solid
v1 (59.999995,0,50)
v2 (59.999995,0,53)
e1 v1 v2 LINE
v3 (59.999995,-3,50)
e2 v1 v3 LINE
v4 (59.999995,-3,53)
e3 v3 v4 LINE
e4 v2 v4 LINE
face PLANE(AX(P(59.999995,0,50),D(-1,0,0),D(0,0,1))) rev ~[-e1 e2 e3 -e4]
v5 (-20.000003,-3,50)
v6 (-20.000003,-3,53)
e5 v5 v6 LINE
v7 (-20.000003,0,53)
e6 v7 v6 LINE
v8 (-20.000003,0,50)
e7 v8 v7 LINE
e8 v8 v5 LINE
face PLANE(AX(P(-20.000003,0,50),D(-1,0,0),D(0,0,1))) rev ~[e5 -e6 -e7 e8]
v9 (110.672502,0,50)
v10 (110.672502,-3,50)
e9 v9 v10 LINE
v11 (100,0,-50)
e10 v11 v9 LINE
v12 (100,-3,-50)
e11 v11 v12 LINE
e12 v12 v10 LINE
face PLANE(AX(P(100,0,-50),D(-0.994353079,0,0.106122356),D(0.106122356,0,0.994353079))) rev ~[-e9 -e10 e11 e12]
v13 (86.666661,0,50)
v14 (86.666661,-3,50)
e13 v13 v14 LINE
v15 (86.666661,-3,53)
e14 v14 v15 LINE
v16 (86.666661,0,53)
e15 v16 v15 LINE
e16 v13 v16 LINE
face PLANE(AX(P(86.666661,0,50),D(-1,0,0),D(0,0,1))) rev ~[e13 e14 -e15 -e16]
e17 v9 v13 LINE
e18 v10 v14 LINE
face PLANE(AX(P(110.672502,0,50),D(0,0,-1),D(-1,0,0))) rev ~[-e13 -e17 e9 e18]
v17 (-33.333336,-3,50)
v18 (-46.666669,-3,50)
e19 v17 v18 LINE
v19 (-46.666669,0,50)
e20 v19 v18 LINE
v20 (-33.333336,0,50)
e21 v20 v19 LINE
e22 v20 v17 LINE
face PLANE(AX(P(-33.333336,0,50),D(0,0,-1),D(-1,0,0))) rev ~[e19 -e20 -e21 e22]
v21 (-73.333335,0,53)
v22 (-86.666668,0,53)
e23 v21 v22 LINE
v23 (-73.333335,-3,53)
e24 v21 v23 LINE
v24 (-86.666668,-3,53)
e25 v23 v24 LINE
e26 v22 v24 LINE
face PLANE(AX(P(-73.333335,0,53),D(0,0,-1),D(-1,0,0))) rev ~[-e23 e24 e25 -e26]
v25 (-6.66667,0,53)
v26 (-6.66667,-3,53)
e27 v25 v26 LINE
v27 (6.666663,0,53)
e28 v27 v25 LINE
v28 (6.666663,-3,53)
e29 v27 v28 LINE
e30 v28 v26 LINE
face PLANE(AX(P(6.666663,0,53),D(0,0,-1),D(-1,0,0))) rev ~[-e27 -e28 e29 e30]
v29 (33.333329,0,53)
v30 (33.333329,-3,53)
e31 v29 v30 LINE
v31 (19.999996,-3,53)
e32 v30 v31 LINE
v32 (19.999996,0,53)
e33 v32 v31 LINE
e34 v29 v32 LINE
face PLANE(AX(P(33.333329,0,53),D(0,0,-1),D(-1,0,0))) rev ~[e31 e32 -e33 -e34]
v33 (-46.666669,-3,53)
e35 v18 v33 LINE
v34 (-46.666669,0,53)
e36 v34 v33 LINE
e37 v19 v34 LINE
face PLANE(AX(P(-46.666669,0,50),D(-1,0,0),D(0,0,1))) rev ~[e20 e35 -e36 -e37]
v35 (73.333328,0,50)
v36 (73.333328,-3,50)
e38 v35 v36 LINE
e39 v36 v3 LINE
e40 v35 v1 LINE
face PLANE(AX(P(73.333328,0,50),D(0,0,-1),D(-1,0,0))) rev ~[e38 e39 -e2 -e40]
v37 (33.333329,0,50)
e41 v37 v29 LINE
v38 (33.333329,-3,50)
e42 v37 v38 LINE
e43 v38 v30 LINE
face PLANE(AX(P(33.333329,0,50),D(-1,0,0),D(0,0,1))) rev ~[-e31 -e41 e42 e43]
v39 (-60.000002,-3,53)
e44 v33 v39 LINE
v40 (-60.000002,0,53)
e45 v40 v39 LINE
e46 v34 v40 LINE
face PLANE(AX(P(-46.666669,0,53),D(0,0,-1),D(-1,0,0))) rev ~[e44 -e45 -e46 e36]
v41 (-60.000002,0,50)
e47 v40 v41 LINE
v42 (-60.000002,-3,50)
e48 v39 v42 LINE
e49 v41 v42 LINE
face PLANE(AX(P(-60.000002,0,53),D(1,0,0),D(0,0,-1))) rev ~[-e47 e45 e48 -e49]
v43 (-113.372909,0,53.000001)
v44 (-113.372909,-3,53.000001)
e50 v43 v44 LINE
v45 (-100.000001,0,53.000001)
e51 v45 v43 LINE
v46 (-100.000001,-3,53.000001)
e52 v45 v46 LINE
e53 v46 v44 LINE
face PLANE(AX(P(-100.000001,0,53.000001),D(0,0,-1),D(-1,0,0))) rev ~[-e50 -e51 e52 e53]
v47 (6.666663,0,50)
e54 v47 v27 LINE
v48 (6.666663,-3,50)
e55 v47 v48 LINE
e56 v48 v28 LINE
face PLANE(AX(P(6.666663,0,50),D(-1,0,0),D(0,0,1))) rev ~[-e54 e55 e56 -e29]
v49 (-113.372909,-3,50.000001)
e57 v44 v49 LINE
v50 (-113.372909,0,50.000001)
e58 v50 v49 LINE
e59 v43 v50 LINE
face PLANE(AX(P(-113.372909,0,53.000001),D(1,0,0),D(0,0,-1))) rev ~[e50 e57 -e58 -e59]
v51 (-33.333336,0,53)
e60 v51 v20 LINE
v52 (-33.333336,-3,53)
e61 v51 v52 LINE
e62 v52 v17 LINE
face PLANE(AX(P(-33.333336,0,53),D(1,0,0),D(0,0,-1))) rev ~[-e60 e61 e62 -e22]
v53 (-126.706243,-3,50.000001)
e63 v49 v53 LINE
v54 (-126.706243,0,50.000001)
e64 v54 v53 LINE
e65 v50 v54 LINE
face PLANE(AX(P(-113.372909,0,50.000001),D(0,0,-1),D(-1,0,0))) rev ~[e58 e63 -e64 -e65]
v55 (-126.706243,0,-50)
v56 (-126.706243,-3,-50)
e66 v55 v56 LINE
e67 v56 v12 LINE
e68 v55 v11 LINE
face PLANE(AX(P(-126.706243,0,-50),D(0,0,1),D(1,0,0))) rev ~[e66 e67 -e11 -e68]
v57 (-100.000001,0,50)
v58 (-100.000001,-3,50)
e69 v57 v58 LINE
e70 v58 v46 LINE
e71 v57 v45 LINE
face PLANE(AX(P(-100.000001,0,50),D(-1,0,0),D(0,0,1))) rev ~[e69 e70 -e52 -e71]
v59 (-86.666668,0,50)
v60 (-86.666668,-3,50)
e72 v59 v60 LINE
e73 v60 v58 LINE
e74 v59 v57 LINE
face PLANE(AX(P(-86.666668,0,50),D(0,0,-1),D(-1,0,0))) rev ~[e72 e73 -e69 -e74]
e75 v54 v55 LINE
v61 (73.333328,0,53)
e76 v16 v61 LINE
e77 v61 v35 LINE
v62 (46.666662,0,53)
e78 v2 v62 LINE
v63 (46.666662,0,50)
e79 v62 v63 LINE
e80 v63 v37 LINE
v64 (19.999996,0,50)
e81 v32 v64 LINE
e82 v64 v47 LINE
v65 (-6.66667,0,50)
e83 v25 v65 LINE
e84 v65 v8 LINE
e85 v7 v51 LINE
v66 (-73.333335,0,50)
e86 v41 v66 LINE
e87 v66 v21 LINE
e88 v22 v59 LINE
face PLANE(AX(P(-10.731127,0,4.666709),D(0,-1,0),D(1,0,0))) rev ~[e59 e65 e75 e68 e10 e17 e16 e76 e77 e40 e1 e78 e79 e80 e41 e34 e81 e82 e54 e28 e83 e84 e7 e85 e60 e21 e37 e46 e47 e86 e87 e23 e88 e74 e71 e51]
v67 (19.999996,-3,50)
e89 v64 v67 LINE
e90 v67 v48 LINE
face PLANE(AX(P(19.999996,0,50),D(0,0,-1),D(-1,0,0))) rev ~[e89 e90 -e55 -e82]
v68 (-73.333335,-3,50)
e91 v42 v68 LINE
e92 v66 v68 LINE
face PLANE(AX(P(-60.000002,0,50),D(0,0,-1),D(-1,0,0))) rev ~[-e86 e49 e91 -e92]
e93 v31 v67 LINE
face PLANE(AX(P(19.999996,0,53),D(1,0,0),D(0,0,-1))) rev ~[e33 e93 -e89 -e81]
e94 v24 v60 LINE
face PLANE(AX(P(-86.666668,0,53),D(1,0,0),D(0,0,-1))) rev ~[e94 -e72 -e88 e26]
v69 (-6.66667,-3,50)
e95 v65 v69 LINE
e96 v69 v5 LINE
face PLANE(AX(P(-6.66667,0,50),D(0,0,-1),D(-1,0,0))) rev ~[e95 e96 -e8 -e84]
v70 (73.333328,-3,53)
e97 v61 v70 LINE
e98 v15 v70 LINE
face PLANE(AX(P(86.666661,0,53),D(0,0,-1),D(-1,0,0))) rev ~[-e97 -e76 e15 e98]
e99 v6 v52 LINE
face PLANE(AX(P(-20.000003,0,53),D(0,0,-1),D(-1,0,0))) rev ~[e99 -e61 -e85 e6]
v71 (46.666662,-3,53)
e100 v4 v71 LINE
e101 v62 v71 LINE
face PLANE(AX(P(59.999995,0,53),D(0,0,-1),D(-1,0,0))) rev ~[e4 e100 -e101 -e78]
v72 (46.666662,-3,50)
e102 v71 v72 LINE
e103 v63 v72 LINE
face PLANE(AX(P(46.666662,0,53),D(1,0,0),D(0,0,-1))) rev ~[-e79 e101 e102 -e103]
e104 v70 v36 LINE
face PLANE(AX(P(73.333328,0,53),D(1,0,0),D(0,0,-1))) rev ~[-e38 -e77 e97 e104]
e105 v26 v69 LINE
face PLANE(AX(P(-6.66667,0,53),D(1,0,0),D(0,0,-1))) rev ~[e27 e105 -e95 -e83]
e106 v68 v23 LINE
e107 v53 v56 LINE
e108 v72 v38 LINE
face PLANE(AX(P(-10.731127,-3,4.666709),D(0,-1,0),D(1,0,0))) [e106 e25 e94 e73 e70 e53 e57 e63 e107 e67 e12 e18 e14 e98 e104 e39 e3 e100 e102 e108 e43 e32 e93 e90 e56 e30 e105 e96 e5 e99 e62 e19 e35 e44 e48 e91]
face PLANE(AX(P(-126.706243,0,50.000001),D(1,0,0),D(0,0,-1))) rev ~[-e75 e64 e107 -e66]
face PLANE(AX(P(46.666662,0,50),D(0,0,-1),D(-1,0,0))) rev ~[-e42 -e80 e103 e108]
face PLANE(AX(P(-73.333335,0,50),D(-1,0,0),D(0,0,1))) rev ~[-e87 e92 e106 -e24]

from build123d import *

# Parameters (mm, degrees)
F1_DEPTH = 3


# Not quite as in the source:
# - ends of sketch curves that miss each other by under 0.0002 mm in the source are joined


with BuildPart() as f1:
    # F0 (on Front) → F1 (new body)
    with BuildSketch(Plane.XZ):
        Polygon((-86.6666681571, 50), (-100.0000014901, 50), (-100.0000014901, 53.0000007451), (-113.3729092283, 53.0000007451), (-113.3729092283, 50.0000007451), (-126.7062425613, 50.0000007451), (-126.7062425613, -50), (100, -50), (110.67250236, 50), (86.6666611759, 50), (86.6666611759, 53), (73.3333278429, 53), (73.3333278429, 50), (59.9999951759, 50), (59.9999951759, 53), (46.6666618429, 53), (46.6666618429, 50), (33.3333291759, 50), (33.3333291759, 53), (19.9999958429, 53), (19.9999958429, 50), (6.6666631759, 50), (6.6666631759, 53), (-6.6666701571, 53), (-6.6666701571, 50), (-20.0000028241, 50), (-20.0000028241, 53), (-33.3333361571, 53), (-33.3333361571, 50), (-46.6666688241, 50), (-46.6666688241, 53), (-60.0000021571, 53), (-60.0000021571, 50), (-73.3333348241, 50), (-73.3333348241, 53), (-86.6666681571, 53), align=None)
    extrude(amount=F1_DEPTH)


solid = f1.part
